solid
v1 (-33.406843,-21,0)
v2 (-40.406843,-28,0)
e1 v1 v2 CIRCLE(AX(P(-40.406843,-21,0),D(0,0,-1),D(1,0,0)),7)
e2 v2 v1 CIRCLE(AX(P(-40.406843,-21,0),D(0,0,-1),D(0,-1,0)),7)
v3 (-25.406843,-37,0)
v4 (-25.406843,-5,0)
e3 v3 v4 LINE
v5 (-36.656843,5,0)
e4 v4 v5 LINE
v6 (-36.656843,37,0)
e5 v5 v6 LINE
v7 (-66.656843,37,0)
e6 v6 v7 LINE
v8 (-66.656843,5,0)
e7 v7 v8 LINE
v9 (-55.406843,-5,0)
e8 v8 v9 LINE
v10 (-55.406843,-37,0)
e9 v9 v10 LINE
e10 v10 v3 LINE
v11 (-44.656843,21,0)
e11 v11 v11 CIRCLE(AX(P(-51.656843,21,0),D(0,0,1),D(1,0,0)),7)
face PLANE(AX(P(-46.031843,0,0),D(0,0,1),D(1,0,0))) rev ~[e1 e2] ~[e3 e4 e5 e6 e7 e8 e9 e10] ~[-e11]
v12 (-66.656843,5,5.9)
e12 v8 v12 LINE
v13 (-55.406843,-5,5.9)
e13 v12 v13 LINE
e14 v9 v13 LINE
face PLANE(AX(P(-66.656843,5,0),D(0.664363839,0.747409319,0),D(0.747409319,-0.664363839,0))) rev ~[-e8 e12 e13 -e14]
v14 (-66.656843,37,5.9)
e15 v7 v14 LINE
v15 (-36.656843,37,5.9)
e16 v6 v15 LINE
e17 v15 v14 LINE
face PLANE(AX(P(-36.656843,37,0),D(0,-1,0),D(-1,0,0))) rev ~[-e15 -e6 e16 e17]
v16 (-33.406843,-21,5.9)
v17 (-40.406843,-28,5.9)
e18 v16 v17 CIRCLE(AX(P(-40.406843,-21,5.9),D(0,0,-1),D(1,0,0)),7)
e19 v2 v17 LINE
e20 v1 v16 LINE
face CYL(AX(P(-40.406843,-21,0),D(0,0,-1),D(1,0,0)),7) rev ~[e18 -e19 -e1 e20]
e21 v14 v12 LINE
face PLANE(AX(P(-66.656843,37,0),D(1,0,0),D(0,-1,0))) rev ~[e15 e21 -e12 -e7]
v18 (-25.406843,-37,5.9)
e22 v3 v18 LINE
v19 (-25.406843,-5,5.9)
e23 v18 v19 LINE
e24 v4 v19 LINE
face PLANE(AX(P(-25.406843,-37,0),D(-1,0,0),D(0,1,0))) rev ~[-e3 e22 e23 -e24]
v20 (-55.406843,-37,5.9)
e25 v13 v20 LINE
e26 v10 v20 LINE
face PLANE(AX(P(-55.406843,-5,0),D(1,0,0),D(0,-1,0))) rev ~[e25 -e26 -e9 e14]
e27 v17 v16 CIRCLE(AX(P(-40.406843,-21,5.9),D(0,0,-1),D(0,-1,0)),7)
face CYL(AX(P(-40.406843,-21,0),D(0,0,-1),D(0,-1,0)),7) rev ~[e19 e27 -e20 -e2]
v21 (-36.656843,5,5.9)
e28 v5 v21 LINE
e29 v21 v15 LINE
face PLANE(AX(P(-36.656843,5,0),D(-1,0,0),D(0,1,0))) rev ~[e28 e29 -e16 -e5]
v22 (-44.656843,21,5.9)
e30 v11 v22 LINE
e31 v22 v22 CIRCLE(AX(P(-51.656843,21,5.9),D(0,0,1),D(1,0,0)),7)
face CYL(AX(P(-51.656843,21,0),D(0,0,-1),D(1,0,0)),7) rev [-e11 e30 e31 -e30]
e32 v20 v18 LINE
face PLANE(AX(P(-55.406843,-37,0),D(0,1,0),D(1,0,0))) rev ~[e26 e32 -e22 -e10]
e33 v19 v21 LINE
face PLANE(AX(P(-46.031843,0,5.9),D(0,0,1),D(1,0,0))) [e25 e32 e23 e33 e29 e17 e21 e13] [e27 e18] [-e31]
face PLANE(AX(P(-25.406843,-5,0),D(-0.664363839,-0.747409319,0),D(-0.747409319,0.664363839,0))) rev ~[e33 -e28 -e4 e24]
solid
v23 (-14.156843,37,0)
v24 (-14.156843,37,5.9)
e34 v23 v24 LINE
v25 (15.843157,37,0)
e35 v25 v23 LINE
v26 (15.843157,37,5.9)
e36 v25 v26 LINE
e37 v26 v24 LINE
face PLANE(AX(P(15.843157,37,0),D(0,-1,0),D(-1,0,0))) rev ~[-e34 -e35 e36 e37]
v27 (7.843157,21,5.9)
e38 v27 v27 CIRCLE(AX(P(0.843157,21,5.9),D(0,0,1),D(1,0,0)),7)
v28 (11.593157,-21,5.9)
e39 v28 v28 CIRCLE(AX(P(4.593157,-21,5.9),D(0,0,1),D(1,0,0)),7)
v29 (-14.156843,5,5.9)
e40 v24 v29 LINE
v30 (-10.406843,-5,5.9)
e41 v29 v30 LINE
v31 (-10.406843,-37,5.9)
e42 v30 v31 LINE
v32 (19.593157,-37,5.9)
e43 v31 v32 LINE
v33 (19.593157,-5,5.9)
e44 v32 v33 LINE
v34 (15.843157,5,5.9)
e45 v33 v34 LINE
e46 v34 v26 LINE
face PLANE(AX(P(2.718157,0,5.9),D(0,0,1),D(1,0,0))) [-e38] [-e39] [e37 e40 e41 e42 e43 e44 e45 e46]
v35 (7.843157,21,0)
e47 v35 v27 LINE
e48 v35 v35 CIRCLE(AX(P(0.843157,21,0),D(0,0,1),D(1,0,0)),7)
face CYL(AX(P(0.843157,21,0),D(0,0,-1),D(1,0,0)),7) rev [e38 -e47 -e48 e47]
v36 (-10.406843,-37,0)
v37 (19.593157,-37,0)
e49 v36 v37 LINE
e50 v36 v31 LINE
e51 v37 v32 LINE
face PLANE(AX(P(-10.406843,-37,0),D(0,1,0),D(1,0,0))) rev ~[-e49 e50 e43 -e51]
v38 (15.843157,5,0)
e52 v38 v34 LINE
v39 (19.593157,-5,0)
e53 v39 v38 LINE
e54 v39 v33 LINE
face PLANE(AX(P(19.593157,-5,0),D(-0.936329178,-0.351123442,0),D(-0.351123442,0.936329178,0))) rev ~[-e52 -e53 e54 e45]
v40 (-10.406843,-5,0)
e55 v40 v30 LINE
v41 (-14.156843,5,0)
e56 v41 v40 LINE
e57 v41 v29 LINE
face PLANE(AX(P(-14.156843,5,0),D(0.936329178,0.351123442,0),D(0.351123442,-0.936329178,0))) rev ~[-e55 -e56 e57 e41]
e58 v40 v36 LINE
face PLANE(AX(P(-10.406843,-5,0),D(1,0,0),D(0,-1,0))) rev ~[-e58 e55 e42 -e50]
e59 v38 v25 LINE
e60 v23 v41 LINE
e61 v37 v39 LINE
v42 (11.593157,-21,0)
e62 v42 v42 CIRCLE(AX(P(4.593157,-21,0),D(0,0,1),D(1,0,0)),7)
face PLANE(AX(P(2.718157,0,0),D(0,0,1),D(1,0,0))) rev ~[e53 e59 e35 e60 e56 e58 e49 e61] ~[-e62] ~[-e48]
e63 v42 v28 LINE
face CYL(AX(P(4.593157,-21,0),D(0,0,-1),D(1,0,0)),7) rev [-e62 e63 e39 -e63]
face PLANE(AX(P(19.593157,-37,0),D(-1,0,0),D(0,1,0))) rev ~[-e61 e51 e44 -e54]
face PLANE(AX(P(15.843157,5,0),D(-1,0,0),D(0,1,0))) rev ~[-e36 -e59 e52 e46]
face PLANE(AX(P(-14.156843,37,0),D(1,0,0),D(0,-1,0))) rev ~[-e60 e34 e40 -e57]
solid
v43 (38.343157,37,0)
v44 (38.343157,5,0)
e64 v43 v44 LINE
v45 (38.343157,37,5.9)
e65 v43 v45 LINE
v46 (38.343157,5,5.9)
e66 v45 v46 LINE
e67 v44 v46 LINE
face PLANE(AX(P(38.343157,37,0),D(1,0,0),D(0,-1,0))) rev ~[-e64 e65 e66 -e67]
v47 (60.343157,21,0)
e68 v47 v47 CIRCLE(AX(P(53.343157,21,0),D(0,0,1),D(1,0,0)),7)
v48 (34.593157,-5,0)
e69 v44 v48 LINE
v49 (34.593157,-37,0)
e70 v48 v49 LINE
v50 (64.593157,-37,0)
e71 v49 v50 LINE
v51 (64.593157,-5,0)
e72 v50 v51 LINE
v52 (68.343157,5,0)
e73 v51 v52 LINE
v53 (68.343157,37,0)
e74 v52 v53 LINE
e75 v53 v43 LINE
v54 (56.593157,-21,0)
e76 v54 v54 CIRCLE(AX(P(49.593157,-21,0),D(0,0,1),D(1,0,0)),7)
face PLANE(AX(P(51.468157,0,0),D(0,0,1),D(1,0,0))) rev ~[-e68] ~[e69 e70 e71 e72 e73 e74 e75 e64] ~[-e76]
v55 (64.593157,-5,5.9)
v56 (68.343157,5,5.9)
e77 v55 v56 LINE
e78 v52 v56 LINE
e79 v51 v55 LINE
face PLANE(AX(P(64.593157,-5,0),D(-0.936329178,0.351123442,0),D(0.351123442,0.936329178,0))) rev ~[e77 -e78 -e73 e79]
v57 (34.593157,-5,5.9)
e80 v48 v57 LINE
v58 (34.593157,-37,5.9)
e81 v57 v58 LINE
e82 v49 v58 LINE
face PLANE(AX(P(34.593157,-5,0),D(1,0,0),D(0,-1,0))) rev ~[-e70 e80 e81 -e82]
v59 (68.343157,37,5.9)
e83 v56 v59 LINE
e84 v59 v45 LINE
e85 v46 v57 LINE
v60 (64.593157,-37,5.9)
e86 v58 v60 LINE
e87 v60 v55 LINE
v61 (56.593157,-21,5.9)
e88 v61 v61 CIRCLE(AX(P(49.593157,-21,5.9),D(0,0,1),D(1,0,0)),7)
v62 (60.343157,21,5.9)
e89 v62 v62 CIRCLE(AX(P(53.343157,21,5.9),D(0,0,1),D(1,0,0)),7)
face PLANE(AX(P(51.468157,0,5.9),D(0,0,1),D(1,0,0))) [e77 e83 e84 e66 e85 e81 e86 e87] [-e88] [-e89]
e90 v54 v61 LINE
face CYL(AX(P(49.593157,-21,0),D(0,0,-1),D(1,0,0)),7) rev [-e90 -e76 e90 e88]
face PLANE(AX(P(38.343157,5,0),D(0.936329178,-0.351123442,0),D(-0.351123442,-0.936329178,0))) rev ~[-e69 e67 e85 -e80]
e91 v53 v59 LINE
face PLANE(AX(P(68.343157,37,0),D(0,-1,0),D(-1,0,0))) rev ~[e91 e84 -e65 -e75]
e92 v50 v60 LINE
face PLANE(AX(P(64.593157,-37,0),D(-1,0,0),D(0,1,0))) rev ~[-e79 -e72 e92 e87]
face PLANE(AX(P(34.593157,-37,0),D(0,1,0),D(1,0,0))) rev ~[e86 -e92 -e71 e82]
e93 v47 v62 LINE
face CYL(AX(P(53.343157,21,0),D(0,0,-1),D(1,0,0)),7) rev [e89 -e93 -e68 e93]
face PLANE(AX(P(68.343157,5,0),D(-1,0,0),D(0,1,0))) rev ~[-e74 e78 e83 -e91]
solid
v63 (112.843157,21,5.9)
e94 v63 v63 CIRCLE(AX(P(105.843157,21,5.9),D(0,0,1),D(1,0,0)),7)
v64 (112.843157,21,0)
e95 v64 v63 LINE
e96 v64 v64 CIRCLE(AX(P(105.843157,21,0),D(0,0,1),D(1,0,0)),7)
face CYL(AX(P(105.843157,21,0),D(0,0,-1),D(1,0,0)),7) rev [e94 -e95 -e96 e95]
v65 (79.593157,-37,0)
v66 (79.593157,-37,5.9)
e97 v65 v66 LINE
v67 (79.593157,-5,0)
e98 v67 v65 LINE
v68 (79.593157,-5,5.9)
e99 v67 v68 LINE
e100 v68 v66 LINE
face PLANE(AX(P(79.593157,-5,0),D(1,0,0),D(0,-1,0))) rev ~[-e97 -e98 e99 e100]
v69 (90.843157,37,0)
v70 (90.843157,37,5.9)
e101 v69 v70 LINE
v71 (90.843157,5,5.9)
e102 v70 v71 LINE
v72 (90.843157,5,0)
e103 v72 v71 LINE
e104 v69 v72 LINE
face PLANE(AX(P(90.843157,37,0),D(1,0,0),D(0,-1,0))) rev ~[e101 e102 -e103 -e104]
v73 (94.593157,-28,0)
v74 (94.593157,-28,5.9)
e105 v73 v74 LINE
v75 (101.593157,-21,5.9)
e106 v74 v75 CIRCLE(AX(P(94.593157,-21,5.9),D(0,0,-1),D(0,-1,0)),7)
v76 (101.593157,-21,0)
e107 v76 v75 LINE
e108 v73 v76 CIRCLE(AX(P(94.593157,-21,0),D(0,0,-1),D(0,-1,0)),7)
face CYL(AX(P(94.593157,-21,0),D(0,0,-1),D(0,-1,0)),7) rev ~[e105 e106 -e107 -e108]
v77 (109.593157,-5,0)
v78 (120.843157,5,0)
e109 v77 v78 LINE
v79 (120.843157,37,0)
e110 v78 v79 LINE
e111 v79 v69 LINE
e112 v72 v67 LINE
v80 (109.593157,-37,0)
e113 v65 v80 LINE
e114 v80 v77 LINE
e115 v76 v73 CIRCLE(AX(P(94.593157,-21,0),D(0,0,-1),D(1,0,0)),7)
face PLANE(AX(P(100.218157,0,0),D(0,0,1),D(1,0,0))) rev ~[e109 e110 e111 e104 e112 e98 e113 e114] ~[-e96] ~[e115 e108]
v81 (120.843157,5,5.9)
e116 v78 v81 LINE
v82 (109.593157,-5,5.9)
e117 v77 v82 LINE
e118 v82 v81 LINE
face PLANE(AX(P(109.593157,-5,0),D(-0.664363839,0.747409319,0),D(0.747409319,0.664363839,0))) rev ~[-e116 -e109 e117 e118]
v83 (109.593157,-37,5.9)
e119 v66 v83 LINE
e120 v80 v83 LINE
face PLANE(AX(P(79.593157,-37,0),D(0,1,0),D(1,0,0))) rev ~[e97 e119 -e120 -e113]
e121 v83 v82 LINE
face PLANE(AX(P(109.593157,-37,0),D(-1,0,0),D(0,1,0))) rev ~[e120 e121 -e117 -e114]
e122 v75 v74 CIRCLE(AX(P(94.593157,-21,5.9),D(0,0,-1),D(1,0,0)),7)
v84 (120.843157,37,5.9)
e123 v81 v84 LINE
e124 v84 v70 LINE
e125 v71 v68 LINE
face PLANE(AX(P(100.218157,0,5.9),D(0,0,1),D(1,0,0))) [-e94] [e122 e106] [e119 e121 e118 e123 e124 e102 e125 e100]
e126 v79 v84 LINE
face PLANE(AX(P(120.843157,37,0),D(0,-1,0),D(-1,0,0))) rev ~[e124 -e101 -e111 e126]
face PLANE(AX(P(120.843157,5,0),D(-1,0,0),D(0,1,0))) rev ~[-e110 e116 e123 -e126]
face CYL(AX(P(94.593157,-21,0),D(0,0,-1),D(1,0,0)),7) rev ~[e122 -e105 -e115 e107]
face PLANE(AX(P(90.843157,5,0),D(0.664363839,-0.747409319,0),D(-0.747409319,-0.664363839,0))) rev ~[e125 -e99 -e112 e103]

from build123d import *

# Parameters (mm, degrees)
F0_R     = 7
F1_DEPTH = 5.9


# Not quite as in the source:
# - a feature names something its author has since deleted; it is built from what else it names


with BuildPart() as f1:
    # F0 (on Top) → F1 (new body)
    with BuildSketch(Plane.XY):
        Polygon((-36.6568425298, 5), (-36.6568425298, 37), (-66.6568425298, 37), (-66.6568425298, 5), (-55.4068425298, -5), (-55.4068425298, -37), (-40.4068425298, -37), (-25.4068425298, -37), (-25.4068425298, -5), align=None)
        with BuildLine():
            ThreePointArc((-33.4068425298, -21), (-35.4570950615, -25.9497474683), (-40.4068425298, -28))
            ThreePointArc((-40.4068425298, -28), (-45.3565899981, -16.0502525317), (-33.4068425298, -21))
        make_face(mode=Mode.SUBTRACT)
        with Locations((-51.6568425298, 21)):
            Circle(F0_R, mode=Mode.SUBTRACT)
    extrude(amount=F1_DEPTH)


with BuildPart() as f1b:
    # F0 (on Top) → F1, piece 2 (new body)
    with BuildSketch(Plane.XY):
        Polygon((15.8431574702, 5), (15.8431574702, 37), (-14.1568425298, 37), (-14.1568425298, 5), (-10.4068425298, -5), (-10.4068425298, -37), (19.5931574702, -37), (19.5931574702, -5), align=None)
        with Locations((4.5931574702, -21)):
            Circle(F0_R, mode=Mode.SUBTRACT)
        with Locations((0.8431574702, 21)):
            Circle(F0_R, mode=Mode.SUBTRACT)
    extrude(amount=F1_DEPTH)


with BuildPart() as f1c:
    # F0 (on Top) → F1, piece 3 (new body)
    with BuildSketch(Plane.XY):
        Polygon((34.5931574702, -5), (34.5931574702, -37), (64.5931574702, -37), (64.5931574702, -5), (68.3431574702, 5), (68.3431574702, 37), (38.3431574702, 37), (38.3431574702, 5), align=None)
        with Locations((49.5931574702, -21)):
            Circle(F0_R, mode=Mode.SUBTRACT)
        with Locations((53.3431574702, 21)):
            Circle(F0_R, mode=Mode.SUBTRACT)
    extrude(amount=F1_DEPTH)


with BuildPart() as f1d:
    # F0 (on Top) → F1, piece 4 (new body)
    with BuildSketch(Plane.XY):
        Polygon((120.8431574702, 37), (90.8431574702, 37), (90.8431574702, 5), (79.5931574702, -5), (79.5931574702, -37), (94.5931574702, -37), (109.5931574702, -37), (109.5931574702, -5), (120.8431574702, 5), align=None)
        with BuildLine():
            ThreePointArc((101.5931574702, -21), (99.5429049385, -25.9497474683), (94.5931574702, -28))
            ThreePointArc((94.5931574702, -28), (89.6434100019, -16.0502525317), (101.5931574702, -21))
        make_face(mode=Mode.SUBTRACT)
        with Locations((105.8431574702, 21)):
            Circle(F0_R, mode=Mode.SUBTRACT)
    extrude(amount=F1_DEPTH)


solid = Compound([f1.part, f1b.part, f1c.part, f1d.part])
